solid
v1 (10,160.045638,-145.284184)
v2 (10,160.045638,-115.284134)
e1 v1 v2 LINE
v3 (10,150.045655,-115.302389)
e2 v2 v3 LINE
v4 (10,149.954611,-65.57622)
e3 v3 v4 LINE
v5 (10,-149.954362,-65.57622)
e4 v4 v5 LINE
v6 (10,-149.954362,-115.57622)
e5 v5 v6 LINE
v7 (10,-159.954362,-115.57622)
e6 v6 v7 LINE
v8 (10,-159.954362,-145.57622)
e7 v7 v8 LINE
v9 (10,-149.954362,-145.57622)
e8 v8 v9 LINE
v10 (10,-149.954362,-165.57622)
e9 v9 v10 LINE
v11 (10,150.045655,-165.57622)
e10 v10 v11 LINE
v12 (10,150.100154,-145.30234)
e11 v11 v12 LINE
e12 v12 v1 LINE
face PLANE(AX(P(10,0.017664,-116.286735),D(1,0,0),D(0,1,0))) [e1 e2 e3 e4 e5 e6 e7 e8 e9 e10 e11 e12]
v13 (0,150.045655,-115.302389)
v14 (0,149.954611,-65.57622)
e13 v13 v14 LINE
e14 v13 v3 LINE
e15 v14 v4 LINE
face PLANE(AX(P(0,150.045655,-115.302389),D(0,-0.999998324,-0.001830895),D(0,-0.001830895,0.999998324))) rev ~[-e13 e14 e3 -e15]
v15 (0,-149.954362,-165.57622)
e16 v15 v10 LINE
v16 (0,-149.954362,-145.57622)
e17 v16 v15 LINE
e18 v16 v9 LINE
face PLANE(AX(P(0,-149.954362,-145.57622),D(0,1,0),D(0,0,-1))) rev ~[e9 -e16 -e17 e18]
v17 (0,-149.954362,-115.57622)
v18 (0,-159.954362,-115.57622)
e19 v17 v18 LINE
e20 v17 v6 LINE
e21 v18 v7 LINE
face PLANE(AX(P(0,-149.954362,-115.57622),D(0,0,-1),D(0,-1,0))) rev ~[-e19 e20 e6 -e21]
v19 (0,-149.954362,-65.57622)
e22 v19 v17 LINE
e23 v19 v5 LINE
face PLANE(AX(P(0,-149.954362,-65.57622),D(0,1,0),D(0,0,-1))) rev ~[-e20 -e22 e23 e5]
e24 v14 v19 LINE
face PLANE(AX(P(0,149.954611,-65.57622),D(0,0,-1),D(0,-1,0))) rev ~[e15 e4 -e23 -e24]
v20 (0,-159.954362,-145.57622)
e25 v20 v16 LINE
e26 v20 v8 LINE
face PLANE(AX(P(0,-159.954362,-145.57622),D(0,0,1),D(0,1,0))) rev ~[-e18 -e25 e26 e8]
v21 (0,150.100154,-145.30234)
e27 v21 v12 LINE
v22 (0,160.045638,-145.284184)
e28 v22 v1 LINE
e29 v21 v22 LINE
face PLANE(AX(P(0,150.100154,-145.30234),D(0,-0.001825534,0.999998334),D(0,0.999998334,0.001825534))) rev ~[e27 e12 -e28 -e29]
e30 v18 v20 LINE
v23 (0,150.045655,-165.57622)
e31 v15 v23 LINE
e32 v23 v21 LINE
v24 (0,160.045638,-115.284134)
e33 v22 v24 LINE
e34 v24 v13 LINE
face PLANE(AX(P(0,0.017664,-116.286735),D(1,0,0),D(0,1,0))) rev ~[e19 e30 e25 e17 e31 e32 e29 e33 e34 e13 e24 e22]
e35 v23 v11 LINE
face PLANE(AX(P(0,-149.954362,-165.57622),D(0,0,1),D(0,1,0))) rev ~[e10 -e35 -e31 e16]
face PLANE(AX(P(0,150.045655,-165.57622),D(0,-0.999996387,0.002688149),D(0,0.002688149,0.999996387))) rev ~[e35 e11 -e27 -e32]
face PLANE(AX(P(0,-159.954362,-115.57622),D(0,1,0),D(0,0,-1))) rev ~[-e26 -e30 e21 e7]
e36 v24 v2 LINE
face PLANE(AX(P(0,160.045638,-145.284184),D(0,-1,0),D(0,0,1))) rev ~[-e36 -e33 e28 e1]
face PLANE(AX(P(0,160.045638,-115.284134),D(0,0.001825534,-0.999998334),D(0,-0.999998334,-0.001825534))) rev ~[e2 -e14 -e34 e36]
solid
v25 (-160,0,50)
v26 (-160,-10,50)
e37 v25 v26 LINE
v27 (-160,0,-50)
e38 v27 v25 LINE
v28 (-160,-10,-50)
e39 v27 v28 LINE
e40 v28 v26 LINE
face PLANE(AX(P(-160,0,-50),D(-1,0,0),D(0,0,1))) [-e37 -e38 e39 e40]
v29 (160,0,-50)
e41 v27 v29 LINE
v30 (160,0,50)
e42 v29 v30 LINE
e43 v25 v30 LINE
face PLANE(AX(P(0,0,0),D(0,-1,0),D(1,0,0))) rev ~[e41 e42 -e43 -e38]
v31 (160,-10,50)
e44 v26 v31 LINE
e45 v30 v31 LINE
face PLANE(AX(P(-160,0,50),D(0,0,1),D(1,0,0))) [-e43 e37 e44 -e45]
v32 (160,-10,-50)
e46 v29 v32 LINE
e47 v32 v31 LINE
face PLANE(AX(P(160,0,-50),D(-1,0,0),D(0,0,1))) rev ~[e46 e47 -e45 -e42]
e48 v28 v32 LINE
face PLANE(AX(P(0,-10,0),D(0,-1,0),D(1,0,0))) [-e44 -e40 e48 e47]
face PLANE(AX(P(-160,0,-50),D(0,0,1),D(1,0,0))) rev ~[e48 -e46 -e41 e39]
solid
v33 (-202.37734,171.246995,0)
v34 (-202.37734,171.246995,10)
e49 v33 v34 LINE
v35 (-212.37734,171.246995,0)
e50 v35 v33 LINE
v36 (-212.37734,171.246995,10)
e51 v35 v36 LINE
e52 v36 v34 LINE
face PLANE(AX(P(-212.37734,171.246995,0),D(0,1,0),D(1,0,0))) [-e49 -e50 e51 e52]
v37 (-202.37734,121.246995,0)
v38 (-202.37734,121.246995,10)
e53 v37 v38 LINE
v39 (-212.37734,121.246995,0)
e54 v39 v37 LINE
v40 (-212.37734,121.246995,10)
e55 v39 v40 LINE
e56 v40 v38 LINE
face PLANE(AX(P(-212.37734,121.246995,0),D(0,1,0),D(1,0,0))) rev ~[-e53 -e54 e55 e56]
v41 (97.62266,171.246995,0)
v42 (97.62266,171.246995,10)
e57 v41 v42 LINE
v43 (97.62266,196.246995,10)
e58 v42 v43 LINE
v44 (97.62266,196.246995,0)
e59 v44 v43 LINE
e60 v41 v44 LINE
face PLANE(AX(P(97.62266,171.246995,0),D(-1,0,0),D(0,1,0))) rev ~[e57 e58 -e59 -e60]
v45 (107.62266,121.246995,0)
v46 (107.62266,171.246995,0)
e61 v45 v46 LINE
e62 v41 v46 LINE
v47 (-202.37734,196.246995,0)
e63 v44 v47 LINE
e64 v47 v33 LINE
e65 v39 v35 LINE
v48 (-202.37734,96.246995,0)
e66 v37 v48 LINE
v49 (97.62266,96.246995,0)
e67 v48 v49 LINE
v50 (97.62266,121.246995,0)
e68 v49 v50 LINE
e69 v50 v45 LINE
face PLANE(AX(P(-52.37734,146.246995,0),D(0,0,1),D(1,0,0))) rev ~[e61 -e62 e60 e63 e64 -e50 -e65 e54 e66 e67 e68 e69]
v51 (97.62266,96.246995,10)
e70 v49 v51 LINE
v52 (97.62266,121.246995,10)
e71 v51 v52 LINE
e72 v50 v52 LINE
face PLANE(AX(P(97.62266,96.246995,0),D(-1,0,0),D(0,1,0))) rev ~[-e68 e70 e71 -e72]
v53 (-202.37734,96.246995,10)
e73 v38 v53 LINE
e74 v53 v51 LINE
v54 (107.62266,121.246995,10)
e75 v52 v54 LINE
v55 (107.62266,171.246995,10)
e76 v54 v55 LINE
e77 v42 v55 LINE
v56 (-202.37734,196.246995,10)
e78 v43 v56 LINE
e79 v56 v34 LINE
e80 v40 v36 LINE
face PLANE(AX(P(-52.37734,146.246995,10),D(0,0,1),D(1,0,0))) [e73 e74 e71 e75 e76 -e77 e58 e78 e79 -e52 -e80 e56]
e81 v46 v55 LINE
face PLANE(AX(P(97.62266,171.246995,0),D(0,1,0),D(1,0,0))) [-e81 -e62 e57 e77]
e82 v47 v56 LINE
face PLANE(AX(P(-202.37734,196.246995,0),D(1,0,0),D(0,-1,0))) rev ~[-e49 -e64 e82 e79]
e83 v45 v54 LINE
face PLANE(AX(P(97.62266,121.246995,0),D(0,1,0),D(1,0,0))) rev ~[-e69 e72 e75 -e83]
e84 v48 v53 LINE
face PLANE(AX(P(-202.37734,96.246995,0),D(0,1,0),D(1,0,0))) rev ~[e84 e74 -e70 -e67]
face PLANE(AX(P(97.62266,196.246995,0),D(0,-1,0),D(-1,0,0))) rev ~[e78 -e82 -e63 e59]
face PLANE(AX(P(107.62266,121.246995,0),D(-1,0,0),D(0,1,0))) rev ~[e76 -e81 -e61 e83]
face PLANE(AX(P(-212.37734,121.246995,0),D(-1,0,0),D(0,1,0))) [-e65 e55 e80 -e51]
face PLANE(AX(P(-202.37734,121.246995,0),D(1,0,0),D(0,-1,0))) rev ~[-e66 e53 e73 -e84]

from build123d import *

# Parameters (mm, degrees)
F0_W     = 320
F0_H     = 100
F1_DEPTH = 10
F2_W     = 10
F2_H     = 50
F3_DEPTH = 10
F5_DEPTH = 10


# Not quite as in the source:
# - a feature names something its author has since deleted; it is built from what else it names


with BuildPart() as f1:
    # F0 (on Front) → F1 (new body)
    with BuildSketch(Plane.XZ):
        Rectangle(F0_W, F0_H)
    extrude(amount=F1_DEPTH)


with BuildPart() as f3:
    # F2 (on Top) → F3 (new body)
    with BuildSketch(Plane.XY):
        Polygon((-202.3773396015, 96.2469950318), (97.6226603985, 96.2469950318), (97.6226603985, 121.2469950318), (97.6226603985, 171.2469950318), (97.6226603985, 196.2469950318), (-202.3773396015, 196.2469950318), (-202.3773396015, 171.2469950318), (-202.3773396015, 121.2469950318), align=None)
        with Locations((-207.3773396015, 146.2469950318)):
            Rectangle(F2_W, F2_H)
        with Locations((102.6226603985, 146.2469950318)):
            Rectangle(F2_W, F2_H)
    extrude(amount=F3_DEPTH)


with BuildPart() as f5:
    # F4 (on Right) → F5 (new body)
    with BuildSketch(Plane.YZ):
        Polygon((-149.9543616176, -165.5762195587), (150.0456550453, -165.5762195587), (150.1001544525, -145.3023395036), (160.0456383824, -145.2841836565), (160.0456383824, -115.2841341545), (150.0456550453, -115.3023894922), (149.9546114852, -65.5762195587), (-149.9543616176, -65.5762195587), (-149.9543616176, -115.5762195587), (-159.9543616176, -115.5762195587), (-159.9543616176, -145.5762195587), (-149.9543616176, -145.5762195587), align=None)
    extrude(amount=F5_DEPTH)


solid = Compound([f1.part, f3.part, f5.part])
